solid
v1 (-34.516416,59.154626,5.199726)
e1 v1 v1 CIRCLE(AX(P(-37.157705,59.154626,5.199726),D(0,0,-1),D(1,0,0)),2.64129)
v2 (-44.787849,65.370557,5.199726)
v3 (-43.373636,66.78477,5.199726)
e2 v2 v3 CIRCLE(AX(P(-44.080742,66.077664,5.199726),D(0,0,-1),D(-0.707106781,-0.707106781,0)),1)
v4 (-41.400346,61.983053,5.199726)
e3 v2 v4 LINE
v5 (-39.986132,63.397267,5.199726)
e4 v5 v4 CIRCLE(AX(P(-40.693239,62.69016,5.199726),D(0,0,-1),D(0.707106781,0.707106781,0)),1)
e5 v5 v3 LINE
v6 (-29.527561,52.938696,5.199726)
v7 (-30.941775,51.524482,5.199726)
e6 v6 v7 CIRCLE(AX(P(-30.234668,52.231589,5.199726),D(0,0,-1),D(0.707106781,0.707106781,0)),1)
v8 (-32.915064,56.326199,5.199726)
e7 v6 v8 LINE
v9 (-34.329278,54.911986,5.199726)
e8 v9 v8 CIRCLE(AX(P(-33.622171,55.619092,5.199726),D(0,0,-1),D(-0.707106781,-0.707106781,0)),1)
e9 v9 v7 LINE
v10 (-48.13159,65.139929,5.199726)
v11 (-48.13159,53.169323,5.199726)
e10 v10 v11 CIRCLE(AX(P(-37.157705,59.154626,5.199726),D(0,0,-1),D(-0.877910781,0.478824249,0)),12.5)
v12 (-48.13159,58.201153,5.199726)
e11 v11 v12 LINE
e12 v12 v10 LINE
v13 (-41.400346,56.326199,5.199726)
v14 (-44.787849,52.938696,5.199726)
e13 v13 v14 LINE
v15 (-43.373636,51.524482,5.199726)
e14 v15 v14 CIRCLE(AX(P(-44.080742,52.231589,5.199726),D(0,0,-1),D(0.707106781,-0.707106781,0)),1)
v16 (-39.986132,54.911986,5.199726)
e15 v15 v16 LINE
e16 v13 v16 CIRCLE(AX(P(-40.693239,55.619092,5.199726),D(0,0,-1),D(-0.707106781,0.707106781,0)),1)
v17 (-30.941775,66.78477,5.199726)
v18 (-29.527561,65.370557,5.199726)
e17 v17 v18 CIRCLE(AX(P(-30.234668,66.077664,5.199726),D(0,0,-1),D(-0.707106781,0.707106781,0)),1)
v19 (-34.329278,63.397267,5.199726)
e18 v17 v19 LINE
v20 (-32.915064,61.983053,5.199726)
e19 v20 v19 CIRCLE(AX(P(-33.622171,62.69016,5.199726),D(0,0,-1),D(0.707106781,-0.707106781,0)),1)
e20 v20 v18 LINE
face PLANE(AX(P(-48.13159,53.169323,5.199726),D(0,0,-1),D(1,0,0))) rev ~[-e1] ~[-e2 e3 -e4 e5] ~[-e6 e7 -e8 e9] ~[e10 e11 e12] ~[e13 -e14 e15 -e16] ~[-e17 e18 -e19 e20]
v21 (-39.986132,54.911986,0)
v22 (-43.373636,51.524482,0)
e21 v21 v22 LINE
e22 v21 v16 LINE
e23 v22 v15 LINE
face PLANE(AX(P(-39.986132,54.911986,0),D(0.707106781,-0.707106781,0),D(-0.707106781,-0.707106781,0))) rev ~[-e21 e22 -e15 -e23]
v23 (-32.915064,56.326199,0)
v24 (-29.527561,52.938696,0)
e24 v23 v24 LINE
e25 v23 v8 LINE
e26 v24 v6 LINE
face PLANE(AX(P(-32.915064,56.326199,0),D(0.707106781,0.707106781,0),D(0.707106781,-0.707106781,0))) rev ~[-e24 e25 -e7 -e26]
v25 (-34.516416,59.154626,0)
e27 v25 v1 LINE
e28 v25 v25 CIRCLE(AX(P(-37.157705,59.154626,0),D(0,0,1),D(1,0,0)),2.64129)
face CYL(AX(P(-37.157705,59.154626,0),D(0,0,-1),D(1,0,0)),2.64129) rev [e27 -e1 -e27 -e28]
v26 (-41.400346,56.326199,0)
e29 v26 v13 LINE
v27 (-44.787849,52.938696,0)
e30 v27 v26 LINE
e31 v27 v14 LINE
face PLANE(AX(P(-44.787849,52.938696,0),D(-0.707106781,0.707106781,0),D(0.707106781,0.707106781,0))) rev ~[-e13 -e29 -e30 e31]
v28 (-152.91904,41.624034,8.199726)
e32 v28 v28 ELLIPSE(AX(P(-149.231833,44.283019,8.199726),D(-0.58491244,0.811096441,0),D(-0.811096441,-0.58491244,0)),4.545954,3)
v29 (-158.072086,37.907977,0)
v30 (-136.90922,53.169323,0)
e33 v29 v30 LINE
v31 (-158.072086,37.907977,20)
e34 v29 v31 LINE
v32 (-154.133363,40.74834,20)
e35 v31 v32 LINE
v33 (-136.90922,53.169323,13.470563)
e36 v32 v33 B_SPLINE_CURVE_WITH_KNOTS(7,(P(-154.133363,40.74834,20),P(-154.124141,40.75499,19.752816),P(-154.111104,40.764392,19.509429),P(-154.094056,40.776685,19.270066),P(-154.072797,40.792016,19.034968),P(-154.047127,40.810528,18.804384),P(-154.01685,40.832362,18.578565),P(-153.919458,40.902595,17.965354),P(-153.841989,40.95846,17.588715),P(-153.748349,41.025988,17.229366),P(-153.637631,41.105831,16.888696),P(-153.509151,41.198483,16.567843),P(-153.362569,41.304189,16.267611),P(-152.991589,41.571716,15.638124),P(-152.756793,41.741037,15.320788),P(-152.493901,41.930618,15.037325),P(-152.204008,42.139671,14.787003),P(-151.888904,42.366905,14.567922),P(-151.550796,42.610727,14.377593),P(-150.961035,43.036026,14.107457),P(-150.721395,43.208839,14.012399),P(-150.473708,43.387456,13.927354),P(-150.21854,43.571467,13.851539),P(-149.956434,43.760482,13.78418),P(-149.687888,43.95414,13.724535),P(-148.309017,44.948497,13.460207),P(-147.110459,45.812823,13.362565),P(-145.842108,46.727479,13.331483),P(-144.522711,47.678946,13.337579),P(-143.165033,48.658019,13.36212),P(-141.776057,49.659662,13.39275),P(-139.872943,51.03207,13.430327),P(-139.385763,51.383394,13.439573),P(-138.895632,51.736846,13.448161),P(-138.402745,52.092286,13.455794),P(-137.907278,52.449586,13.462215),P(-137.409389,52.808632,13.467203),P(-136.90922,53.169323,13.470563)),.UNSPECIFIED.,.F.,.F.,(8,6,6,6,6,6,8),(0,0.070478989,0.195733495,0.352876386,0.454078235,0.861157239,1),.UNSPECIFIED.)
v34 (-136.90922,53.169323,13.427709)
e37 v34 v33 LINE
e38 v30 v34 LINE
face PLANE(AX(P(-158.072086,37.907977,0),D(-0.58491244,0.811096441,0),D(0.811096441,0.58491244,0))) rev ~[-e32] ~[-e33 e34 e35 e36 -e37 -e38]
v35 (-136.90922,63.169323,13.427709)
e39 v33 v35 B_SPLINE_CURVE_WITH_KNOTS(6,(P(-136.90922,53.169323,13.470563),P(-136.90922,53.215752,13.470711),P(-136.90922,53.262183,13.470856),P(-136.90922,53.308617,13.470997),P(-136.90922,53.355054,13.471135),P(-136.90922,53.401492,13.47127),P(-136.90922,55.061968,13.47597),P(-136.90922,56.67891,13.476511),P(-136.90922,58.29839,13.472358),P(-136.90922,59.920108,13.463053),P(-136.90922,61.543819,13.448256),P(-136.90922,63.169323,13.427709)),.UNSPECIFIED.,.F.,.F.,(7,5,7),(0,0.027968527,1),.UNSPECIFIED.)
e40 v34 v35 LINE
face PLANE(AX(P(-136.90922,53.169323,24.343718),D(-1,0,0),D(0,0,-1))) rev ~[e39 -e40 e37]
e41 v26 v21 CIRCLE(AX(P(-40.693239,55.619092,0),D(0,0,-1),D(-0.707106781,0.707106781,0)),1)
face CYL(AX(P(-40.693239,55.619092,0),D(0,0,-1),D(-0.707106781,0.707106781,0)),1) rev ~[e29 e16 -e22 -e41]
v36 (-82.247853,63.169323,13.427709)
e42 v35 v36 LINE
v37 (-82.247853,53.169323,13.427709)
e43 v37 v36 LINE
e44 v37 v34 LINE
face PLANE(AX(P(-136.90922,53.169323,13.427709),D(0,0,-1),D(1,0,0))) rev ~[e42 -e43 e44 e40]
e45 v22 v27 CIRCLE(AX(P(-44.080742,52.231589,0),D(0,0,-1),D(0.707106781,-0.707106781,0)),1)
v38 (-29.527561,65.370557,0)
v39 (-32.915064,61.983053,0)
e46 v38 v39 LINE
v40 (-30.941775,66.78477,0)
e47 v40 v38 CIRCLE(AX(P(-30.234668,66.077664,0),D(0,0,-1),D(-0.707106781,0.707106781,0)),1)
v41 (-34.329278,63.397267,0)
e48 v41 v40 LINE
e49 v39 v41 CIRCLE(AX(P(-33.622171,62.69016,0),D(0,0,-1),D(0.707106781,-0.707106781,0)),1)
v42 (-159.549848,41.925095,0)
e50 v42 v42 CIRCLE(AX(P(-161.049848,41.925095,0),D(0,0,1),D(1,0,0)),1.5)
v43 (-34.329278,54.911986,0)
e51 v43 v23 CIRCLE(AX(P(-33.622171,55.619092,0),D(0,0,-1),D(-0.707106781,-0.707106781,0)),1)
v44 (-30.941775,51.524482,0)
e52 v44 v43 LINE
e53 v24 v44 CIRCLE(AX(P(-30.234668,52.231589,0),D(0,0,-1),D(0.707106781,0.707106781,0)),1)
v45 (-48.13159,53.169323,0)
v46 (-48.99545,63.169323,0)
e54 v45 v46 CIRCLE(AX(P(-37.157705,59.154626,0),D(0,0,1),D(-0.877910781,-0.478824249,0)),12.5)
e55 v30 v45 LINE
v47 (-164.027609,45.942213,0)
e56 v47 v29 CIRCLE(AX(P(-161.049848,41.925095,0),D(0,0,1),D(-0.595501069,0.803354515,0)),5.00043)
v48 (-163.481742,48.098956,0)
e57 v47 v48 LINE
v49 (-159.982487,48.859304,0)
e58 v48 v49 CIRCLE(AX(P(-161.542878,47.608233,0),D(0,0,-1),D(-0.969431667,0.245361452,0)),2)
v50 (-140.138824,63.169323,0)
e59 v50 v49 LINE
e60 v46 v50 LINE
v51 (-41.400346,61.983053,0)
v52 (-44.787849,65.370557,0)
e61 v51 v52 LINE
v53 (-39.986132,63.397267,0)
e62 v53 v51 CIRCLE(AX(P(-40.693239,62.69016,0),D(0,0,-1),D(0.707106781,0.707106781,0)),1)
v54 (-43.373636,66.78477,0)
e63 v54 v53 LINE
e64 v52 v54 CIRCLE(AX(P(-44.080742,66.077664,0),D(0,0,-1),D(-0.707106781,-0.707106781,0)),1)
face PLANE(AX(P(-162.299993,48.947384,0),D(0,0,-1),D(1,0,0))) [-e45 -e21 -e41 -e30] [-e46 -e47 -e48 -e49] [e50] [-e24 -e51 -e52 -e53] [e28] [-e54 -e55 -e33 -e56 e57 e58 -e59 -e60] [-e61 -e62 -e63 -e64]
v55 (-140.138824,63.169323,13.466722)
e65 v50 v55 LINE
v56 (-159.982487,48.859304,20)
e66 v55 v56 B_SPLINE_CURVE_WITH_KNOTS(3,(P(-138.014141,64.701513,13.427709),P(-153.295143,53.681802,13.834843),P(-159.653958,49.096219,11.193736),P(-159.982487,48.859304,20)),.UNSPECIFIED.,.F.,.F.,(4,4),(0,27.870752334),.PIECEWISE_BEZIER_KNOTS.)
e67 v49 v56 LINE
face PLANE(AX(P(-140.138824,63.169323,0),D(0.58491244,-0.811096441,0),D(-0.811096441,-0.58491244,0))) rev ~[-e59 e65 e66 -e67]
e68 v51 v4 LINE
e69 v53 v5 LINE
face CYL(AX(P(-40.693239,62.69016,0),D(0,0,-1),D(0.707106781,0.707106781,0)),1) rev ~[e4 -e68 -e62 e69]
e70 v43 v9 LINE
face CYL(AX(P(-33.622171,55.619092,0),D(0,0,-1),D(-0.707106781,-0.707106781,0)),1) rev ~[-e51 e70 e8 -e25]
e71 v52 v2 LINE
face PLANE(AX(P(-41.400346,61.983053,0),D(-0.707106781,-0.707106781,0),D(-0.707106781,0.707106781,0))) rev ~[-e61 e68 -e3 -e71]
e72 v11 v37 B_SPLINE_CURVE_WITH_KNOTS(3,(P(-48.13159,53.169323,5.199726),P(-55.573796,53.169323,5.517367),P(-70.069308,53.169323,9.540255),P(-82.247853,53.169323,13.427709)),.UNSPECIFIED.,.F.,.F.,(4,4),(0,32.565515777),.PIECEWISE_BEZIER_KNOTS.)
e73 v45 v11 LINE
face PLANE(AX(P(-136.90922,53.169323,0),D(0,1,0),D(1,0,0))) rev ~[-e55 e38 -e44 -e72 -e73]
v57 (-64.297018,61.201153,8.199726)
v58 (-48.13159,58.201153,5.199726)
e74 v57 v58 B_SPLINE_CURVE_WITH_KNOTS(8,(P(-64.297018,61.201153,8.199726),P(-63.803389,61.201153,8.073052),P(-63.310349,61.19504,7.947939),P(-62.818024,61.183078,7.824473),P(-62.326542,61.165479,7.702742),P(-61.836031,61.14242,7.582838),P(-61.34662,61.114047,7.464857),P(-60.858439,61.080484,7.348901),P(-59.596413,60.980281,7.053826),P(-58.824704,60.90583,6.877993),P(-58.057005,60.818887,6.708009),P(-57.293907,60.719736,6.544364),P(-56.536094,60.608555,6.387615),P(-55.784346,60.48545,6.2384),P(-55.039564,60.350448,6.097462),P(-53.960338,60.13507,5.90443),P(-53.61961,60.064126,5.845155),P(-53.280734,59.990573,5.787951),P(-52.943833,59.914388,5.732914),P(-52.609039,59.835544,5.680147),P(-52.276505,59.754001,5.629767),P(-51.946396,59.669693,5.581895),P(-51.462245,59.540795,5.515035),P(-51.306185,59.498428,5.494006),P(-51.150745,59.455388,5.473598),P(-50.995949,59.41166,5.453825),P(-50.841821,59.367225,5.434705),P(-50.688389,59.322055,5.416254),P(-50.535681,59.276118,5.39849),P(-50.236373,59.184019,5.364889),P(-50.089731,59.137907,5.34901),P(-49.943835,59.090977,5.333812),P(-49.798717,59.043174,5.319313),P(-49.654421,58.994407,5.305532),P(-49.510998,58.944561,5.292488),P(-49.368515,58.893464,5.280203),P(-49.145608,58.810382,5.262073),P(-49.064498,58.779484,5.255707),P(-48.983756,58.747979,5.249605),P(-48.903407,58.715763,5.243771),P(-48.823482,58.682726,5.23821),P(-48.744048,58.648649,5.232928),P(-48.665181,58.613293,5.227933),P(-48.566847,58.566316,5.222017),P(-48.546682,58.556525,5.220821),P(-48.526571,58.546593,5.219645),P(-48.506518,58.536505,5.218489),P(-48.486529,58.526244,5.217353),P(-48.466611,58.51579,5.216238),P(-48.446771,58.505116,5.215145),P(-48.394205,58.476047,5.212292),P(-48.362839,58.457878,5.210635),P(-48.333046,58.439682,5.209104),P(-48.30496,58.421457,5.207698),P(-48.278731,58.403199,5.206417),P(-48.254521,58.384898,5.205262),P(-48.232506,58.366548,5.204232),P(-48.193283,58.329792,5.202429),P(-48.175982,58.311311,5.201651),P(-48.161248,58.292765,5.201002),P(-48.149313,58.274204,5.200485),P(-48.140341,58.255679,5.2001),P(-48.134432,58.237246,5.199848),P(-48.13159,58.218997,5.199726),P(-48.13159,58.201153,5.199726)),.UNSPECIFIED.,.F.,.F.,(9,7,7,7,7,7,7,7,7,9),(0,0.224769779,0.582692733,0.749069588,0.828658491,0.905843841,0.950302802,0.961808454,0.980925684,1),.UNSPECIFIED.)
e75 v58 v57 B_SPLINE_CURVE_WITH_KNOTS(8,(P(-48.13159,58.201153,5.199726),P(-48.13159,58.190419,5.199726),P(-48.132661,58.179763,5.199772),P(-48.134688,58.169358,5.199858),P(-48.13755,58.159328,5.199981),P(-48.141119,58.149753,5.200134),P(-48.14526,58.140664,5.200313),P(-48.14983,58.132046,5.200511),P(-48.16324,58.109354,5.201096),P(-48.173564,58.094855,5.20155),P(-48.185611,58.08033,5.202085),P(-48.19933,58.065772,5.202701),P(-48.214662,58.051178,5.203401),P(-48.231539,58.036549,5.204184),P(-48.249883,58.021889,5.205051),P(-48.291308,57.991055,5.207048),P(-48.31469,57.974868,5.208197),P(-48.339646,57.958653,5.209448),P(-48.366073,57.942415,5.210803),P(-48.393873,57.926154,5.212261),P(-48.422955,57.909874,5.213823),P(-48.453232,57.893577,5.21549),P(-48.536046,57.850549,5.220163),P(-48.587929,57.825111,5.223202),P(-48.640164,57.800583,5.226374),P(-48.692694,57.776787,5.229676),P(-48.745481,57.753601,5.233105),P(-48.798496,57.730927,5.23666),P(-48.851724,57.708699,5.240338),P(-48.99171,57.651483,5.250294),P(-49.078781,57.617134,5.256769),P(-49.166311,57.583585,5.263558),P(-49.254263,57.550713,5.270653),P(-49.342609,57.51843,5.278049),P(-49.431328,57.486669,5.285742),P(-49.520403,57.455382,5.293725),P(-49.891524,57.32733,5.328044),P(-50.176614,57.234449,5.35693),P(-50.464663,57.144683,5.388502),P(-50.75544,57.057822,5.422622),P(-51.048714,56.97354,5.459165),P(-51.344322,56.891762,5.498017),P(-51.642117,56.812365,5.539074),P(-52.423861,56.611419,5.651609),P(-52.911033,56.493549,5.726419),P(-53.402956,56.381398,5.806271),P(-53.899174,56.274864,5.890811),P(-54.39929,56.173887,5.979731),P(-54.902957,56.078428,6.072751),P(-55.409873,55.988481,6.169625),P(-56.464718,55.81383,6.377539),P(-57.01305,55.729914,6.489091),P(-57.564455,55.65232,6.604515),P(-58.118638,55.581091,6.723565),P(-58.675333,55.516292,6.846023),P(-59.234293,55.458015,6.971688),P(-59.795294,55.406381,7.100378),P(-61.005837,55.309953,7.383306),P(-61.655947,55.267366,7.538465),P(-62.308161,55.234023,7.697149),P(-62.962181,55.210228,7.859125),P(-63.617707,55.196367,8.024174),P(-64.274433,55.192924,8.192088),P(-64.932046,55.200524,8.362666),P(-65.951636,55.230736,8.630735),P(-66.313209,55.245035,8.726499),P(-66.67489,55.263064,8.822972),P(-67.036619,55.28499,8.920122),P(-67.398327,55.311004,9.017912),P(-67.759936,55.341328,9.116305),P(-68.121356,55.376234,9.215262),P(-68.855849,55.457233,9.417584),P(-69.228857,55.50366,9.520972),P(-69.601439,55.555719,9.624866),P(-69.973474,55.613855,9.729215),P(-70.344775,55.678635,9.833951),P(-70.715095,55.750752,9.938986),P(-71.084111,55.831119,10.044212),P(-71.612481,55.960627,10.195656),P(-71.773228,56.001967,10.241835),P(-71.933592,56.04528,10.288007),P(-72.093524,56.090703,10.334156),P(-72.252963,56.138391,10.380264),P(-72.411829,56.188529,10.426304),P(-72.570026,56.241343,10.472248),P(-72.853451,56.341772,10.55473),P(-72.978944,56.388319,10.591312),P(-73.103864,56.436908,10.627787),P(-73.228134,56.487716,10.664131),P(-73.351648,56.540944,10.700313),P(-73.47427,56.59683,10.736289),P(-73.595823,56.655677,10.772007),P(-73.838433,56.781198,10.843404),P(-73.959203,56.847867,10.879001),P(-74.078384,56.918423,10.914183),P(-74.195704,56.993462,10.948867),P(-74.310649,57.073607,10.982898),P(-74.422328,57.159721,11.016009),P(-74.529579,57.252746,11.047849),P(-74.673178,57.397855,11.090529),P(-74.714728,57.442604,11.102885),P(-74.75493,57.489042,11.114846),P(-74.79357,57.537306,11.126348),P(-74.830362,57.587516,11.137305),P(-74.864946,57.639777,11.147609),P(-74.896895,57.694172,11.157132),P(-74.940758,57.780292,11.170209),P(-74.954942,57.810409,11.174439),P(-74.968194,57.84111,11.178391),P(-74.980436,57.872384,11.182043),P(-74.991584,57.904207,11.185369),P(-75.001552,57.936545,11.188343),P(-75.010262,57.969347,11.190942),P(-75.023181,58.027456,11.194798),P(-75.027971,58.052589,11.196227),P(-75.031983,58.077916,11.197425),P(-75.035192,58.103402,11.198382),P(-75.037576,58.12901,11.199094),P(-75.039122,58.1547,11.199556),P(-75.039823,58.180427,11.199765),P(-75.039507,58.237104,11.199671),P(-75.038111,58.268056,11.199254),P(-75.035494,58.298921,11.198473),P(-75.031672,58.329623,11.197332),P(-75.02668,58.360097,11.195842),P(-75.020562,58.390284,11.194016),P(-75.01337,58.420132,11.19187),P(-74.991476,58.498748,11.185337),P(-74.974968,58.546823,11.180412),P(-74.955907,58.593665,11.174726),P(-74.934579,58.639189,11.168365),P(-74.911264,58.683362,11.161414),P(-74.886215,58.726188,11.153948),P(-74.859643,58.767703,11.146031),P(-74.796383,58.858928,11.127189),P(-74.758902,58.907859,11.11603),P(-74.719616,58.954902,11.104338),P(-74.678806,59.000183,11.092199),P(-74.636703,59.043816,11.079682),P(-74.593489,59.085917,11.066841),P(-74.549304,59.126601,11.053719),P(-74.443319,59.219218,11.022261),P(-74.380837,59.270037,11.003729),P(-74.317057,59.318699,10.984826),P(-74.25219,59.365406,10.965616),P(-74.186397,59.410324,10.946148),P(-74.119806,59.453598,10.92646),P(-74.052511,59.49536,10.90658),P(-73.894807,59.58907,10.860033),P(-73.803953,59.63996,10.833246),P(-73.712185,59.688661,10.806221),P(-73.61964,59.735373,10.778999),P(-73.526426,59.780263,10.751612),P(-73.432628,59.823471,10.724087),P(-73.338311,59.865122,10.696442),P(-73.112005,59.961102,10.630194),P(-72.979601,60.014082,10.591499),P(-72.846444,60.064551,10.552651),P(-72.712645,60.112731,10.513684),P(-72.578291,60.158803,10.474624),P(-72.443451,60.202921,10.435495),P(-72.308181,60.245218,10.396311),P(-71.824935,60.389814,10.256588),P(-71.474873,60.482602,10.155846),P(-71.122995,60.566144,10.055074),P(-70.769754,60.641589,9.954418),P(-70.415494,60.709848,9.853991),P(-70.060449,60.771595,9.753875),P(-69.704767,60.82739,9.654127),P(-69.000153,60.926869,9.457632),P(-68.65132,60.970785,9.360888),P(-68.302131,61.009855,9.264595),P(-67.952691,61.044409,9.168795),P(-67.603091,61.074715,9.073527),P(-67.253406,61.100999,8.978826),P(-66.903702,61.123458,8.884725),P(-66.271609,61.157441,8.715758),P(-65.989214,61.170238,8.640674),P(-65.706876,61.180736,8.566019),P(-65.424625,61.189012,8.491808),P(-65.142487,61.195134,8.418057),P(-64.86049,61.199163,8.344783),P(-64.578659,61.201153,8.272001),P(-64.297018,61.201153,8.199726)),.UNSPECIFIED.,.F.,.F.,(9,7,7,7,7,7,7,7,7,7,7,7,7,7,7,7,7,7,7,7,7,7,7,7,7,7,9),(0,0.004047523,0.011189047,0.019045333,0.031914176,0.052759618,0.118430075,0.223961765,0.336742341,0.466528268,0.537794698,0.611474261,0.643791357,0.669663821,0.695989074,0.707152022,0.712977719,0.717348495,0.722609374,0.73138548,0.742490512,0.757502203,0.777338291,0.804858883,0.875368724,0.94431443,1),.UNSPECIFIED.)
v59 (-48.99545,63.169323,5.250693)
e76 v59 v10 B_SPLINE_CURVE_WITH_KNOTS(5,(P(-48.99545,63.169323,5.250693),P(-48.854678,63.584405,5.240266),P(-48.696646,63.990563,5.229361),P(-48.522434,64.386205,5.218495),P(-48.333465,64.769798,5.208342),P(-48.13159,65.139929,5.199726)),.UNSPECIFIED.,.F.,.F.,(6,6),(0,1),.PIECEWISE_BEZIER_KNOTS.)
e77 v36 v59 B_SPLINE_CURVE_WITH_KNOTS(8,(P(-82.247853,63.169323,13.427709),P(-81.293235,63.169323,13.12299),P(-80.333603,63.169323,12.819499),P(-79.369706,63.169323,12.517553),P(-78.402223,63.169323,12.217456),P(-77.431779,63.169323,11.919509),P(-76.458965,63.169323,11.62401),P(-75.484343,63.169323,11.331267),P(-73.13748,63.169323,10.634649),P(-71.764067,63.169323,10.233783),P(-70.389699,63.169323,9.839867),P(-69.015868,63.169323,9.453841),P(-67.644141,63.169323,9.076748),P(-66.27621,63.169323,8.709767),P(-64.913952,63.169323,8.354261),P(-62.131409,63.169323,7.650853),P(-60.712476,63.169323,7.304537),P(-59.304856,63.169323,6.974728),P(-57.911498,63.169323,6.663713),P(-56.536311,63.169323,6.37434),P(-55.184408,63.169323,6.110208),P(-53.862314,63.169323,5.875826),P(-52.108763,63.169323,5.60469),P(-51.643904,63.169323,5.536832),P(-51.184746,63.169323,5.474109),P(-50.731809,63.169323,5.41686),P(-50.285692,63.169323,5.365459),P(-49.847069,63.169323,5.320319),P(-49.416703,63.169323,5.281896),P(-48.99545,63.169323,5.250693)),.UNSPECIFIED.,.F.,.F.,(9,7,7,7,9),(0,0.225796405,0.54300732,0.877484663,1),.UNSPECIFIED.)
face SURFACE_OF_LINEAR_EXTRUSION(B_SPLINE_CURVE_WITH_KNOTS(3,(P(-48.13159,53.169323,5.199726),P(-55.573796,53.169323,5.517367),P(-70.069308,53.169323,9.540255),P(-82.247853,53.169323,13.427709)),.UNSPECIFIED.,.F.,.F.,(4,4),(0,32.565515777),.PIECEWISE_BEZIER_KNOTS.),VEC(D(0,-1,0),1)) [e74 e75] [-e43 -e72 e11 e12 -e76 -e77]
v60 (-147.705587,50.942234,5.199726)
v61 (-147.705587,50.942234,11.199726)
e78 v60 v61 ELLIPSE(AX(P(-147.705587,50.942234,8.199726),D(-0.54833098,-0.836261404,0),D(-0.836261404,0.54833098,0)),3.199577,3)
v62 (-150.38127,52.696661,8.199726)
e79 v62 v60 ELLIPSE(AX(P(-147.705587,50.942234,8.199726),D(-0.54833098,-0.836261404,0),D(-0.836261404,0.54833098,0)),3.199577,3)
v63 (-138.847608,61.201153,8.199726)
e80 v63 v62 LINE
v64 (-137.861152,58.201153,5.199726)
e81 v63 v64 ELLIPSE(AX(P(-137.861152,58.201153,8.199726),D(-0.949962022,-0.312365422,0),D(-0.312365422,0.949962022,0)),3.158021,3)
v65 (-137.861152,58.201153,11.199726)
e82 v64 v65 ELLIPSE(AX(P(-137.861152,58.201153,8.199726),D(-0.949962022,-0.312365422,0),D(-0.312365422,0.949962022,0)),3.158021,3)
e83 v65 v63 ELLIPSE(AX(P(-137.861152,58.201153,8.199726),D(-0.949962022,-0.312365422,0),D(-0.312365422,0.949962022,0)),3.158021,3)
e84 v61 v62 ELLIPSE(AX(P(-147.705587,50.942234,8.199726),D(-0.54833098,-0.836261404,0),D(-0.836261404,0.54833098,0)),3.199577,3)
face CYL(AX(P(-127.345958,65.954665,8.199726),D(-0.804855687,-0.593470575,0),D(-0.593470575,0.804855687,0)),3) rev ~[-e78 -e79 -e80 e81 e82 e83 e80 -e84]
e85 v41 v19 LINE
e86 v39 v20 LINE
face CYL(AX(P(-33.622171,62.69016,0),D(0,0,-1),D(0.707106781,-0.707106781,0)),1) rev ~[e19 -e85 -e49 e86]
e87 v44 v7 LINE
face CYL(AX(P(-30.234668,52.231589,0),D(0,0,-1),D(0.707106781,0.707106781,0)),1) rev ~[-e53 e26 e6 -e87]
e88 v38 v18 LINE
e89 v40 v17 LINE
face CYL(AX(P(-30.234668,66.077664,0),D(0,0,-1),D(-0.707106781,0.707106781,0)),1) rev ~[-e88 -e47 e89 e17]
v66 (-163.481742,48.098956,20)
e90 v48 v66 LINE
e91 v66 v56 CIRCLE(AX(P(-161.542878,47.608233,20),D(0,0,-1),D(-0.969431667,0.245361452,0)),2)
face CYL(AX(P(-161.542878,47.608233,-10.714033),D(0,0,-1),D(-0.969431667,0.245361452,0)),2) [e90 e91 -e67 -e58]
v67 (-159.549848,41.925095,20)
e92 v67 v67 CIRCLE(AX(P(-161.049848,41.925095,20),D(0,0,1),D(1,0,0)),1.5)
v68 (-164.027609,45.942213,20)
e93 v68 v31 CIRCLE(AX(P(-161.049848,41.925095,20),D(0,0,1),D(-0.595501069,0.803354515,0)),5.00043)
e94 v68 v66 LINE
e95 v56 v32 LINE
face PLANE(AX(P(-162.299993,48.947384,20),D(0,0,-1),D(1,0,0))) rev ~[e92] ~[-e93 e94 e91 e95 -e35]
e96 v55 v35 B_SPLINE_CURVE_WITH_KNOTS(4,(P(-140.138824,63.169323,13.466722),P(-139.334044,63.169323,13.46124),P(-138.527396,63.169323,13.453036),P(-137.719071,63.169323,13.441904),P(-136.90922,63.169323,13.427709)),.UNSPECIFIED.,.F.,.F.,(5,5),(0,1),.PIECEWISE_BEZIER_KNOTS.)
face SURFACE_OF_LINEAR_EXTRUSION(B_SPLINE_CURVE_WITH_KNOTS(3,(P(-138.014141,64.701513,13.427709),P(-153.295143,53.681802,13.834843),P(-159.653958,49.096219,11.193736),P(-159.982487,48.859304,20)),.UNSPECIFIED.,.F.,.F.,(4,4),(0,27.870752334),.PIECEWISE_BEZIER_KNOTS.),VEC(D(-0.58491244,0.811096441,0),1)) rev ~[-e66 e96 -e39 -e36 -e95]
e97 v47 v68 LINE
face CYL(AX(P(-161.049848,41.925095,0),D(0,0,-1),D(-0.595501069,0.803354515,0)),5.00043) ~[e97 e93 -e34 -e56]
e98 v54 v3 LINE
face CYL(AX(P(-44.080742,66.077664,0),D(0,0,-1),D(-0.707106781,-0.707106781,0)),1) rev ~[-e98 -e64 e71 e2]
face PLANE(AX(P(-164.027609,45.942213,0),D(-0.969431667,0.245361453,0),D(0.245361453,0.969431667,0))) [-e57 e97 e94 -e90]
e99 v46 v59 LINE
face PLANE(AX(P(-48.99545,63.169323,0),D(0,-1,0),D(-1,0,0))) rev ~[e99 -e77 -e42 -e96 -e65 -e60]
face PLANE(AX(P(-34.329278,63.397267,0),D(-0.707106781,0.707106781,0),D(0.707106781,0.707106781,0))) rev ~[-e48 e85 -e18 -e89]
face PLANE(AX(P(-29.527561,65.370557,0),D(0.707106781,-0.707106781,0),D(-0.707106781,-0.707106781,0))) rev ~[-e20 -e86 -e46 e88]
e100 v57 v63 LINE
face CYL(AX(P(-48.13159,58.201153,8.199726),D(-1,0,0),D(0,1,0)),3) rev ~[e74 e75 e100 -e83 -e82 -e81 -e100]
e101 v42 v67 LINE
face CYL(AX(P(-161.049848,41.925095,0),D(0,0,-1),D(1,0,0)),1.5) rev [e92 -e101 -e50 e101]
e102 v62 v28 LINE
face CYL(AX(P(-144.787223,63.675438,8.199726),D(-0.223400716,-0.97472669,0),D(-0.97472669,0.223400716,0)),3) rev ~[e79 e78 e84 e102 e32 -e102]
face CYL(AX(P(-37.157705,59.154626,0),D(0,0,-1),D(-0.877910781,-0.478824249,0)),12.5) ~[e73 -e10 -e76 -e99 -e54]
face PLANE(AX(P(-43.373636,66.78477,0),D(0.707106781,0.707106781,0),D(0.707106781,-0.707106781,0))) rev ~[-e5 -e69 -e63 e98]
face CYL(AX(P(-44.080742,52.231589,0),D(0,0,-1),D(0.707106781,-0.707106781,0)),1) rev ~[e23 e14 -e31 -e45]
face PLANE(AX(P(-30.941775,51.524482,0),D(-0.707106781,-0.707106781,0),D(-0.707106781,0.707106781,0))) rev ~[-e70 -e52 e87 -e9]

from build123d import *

# Parameters (mm, degrees)
F0_R          = 1.5
F0_R_2        = 2.6412895019
F1_DEPTH      = 20
F3_DEPTH      = 25
F3_DEPTH_BACK = 25
F5_DEPTH      = 25
F8_R          = 3
F11_DEPTH     = 20
F12_T1_DEPTH  = 41.4280655281


# Not quite as in the source:
# - a fillet or chamfer that OpenCascade refuses, or shapes differently, is made with other operations: its cross-section is extruded or revolved along the edge and cut away or added


with BuildPart() as f1:
    # F0 (on Top) → F1 (new body)
    with BuildSketch(Plane.XY):
        with BuildLine():
            Line((-136.9092201152, 53.1693232265), (-48.1315898414, 53.1693232265))
            ThreePointArc((-48.1315898414, 53.1693232265), (-24.7040865671, 60.2304450376), (-48.9954501741, 63.1693232265))
            Line((-48.9954501741, 63.1693232265), (-140.1388241649, 63.1693232265))
            Line((-140.1388241649, 63.1693232265), (-164.0276092996, 45.9422132412))
            ThreePointArc((-164.0276092996, 45.9422132412), (-165.0669659453, 38.947333564), (-158.0720862682, 37.9079769183))
            Line((-158.0720862682, 37.9079769183), (-136.9092201152, 53.1693232265))
        make_face()
        with Locations((-161.0498477839, 41.9250950797)):
            Circle(F0_R, mode=Mode.SUBTRACT)
        with BuildLine():
            ThreePointArc((-43.3736355328, 51.5244823211), (-44.7878490952, 51.5244823211), (-44.7878490952, 52.9386958835))
            Line((-44.7878490952, 52.9386958835), (-41.4003457692, 56.3261992095))
            ThreePointArc((-41.4003457692, 56.3261992095), (-39.9861322069, 56.3261992095), (-39.9861322069, 54.9119856471))
            Line((-39.9861322069, 54.9119856471), (-43.3736355328, 51.5244823211))
        make_face(mode=Mode.SUBTRACT)
        with BuildLine():
            ThreePointArc((-29.527561069, 52.9386958835), (-29.527561069, 51.5244823211), (-30.9417746314, 51.5244823211))
            Line((-30.9417746314, 51.5244823211), (-34.3292779574, 54.9119856471))
            ThreePointArc((-34.3292779574, 54.9119856471), (-34.3292779574, 56.3261992095), (-32.915064395, 56.3261992095))
            Line((-32.915064395, 56.3261992095), (-29.527561069, 52.9386958835))
        make_face(mode=Mode.SUBTRACT)
        with Locations((-37.1577050821, 59.1546263342)):
            Circle(F0_R_2, mode=Mode.SUBTRACT)
        with BuildLine():
            Line((-41.4003457692, 61.9830534589), (-44.7878490952, 65.3705567849))
            ThreePointArc((-44.7878490952, 65.3705567849), (-44.7878490952, 66.7847703473), (-43.3736355328, 66.7847703473))
            Line((-43.3736355328, 66.7847703473), (-39.9861322069, 63.3972670213))
            ThreePointArc((-39.9861322069, 63.3972670213), (-39.9861322069, 61.9830534589), (-41.4003457692, 61.9830534589))
        make_face(mode=Mode.SUBTRACT)
        with BuildLine():
            ThreePointArc((-30.9417746314, 66.7847703473), (-29.527561069, 66.7847703473), (-29.527561069, 65.3705567849))
            Line((-29.527561069, 65.3705567849), (-32.915064395, 61.9830534589))
            ThreePointArc((-32.915064395, 61.9830534589), (-34.3292779574, 61.9830534589), (-34.3292779574, 63.3972670213))
            Line((-34.3292779574, 63.3972670213), (-30.9417746314, 66.7847703473))
        make_face(mode=Mode.SUBTRACT)
    extrude(amount=F1_DEPTH)

    # F2 (on face) → F3 (cut, two sides)
    with BuildSketch(Plane.XZ.offset(-53.1693232265)) as f3_sk:
        with BuildLine():
            add(Edge.make_bspline(
                [(-48.1315898414, 5.1997262053), (-55.5737955735, 5.517366778), (-70.0693075174, 9.5402547737), (-82.2478533544, 13.4277092293)],
                knots=[0, 0, 0, 0, 32.5655157772, 32.5655157772, 32.5655157772, 32.5655157772], degree=3))
            Line((-48.1315898414, 5.1997262053), (-22.6805435396, 5.1997262053))
            Line((-22.6805435396, 5.1997262053), (-24.4416198375, 23.0218202323))
            Line((-24.4416198375, 23.0218202323), (-102.9450073838, 23.9689107984))
            Line((-102.9450073838, 23.9689107984), (-109.8586171865, 20))
            Line((-109.8586171865, 20), (-136.9092201152, 24.3437178433))
            Line((-136.9092201152, 24.3437178433), (-136.9092201152, 13.4277092293))
            Line((-136.9092201152, 13.4277092293), (-82.2478533544, 13.4277092293))
        make_face()
    extrude(amount=-F3_DEPTH, mode=Mode.SUBTRACT)
    extrude(f3_sk.sketch, amount=F3_DEPTH_BACK, mode=Mode.SUBTRACT)

    # F4 (on face) → F5 (cut)
    with BuildSketch(Plane(origin=(-77.913469167, 108.0423893277, 0), x_dir=(-0.8110964415, -0.5849124402, 0), z_dir=(-0.5849124402, 0.8110964415, 0))):
        with BuildLine():
            Line((73.6283713512, 25.1456971396), (74.0980582459, 13.4277092293))
            add(Edge.make_bspline(
                [(74.0980582459, 13.4277092293), (92.9379910232, 13.834843412), (100.7777675986, 11.1937364563), (101.1828109622, 20)],
                knots=[0, 0, 0, 0, 27.8707523342, 27.8707523342, 27.8707523342, 27.8707523342], degree=3))
            Line((101.1828109622, 20), (97.8787563539, 26.1177145299))
            Line((97.8787563539, 26.1177145299), (73.6283713512, 25.1456971396))
        make_face()
    extrude(amount=-F5_DEPTH, mode=Mode.SUBTRACT)

    # F9: sweep along a path in F6
    with BuildLine(Plane.XY.offset(5.1997262053)) as f9_path:
        Line((-61.2067505717, 58.1693232265), (-86.7135846391, 58.1693232265))
        Line((-86.7135846391, 58.1693232265), (-137.850685735, 58.1693232265))
        Line((-137.850685735, 58.1693232265), (-147.6771980524, 50.9236194193))
        Line((-147.6771980524, 50.9236194193), (-156.9756269455, 10.3533519432))
    # F8 (on face) → F9 (sweep, cut)
    with BuildSketch(Plane.YZ.offset(-48.1315898414)):
        with Locations((58.2011528313, 8.1997262053)):
            Circle(F8_R)
    sweep(path=f9_path.line, transition=Transition.RIGHT, mode=Mode.SUBTRACT)

    # F10 (on face) → F11 (join)
    with BuildSketch(Plane(origin=(0, 0, 0), x_dir=(1, 0, 0), z_dir=(0, 0, -1))):
        Polygon((-159.9824870749, -48.8593044651), (-164.0276092996, -45.9422132412), (-162.4302172451, -52.2535650319), align=None)
    extrude(amount=-F11_DEPTH)

    # F12: fillet of radius 2 on 1 edges, made by hand

    # F12_s2 → F12_t1 (cut)
    with BuildSketch(Plane.XY.offset(-10.7140327641)):
        with BuildLine():
            ThreePointArc((-163.4817415016, 48.0989559734), (-161.9675459982, 49.5626274076), (-159.9824870749, 48.8593044651))
            Line((-159.9824870749, 48.8593044651), (-162.4302172451, 52.2535650319))
            Line((-162.4302172451, 52.2535650319), (-163.4817415016, 48.0989559734))
        make_face()
    extrude(amount=F12_T1_DEPTH, mode=Mode.SUBTRACT)


solid = f1.part
